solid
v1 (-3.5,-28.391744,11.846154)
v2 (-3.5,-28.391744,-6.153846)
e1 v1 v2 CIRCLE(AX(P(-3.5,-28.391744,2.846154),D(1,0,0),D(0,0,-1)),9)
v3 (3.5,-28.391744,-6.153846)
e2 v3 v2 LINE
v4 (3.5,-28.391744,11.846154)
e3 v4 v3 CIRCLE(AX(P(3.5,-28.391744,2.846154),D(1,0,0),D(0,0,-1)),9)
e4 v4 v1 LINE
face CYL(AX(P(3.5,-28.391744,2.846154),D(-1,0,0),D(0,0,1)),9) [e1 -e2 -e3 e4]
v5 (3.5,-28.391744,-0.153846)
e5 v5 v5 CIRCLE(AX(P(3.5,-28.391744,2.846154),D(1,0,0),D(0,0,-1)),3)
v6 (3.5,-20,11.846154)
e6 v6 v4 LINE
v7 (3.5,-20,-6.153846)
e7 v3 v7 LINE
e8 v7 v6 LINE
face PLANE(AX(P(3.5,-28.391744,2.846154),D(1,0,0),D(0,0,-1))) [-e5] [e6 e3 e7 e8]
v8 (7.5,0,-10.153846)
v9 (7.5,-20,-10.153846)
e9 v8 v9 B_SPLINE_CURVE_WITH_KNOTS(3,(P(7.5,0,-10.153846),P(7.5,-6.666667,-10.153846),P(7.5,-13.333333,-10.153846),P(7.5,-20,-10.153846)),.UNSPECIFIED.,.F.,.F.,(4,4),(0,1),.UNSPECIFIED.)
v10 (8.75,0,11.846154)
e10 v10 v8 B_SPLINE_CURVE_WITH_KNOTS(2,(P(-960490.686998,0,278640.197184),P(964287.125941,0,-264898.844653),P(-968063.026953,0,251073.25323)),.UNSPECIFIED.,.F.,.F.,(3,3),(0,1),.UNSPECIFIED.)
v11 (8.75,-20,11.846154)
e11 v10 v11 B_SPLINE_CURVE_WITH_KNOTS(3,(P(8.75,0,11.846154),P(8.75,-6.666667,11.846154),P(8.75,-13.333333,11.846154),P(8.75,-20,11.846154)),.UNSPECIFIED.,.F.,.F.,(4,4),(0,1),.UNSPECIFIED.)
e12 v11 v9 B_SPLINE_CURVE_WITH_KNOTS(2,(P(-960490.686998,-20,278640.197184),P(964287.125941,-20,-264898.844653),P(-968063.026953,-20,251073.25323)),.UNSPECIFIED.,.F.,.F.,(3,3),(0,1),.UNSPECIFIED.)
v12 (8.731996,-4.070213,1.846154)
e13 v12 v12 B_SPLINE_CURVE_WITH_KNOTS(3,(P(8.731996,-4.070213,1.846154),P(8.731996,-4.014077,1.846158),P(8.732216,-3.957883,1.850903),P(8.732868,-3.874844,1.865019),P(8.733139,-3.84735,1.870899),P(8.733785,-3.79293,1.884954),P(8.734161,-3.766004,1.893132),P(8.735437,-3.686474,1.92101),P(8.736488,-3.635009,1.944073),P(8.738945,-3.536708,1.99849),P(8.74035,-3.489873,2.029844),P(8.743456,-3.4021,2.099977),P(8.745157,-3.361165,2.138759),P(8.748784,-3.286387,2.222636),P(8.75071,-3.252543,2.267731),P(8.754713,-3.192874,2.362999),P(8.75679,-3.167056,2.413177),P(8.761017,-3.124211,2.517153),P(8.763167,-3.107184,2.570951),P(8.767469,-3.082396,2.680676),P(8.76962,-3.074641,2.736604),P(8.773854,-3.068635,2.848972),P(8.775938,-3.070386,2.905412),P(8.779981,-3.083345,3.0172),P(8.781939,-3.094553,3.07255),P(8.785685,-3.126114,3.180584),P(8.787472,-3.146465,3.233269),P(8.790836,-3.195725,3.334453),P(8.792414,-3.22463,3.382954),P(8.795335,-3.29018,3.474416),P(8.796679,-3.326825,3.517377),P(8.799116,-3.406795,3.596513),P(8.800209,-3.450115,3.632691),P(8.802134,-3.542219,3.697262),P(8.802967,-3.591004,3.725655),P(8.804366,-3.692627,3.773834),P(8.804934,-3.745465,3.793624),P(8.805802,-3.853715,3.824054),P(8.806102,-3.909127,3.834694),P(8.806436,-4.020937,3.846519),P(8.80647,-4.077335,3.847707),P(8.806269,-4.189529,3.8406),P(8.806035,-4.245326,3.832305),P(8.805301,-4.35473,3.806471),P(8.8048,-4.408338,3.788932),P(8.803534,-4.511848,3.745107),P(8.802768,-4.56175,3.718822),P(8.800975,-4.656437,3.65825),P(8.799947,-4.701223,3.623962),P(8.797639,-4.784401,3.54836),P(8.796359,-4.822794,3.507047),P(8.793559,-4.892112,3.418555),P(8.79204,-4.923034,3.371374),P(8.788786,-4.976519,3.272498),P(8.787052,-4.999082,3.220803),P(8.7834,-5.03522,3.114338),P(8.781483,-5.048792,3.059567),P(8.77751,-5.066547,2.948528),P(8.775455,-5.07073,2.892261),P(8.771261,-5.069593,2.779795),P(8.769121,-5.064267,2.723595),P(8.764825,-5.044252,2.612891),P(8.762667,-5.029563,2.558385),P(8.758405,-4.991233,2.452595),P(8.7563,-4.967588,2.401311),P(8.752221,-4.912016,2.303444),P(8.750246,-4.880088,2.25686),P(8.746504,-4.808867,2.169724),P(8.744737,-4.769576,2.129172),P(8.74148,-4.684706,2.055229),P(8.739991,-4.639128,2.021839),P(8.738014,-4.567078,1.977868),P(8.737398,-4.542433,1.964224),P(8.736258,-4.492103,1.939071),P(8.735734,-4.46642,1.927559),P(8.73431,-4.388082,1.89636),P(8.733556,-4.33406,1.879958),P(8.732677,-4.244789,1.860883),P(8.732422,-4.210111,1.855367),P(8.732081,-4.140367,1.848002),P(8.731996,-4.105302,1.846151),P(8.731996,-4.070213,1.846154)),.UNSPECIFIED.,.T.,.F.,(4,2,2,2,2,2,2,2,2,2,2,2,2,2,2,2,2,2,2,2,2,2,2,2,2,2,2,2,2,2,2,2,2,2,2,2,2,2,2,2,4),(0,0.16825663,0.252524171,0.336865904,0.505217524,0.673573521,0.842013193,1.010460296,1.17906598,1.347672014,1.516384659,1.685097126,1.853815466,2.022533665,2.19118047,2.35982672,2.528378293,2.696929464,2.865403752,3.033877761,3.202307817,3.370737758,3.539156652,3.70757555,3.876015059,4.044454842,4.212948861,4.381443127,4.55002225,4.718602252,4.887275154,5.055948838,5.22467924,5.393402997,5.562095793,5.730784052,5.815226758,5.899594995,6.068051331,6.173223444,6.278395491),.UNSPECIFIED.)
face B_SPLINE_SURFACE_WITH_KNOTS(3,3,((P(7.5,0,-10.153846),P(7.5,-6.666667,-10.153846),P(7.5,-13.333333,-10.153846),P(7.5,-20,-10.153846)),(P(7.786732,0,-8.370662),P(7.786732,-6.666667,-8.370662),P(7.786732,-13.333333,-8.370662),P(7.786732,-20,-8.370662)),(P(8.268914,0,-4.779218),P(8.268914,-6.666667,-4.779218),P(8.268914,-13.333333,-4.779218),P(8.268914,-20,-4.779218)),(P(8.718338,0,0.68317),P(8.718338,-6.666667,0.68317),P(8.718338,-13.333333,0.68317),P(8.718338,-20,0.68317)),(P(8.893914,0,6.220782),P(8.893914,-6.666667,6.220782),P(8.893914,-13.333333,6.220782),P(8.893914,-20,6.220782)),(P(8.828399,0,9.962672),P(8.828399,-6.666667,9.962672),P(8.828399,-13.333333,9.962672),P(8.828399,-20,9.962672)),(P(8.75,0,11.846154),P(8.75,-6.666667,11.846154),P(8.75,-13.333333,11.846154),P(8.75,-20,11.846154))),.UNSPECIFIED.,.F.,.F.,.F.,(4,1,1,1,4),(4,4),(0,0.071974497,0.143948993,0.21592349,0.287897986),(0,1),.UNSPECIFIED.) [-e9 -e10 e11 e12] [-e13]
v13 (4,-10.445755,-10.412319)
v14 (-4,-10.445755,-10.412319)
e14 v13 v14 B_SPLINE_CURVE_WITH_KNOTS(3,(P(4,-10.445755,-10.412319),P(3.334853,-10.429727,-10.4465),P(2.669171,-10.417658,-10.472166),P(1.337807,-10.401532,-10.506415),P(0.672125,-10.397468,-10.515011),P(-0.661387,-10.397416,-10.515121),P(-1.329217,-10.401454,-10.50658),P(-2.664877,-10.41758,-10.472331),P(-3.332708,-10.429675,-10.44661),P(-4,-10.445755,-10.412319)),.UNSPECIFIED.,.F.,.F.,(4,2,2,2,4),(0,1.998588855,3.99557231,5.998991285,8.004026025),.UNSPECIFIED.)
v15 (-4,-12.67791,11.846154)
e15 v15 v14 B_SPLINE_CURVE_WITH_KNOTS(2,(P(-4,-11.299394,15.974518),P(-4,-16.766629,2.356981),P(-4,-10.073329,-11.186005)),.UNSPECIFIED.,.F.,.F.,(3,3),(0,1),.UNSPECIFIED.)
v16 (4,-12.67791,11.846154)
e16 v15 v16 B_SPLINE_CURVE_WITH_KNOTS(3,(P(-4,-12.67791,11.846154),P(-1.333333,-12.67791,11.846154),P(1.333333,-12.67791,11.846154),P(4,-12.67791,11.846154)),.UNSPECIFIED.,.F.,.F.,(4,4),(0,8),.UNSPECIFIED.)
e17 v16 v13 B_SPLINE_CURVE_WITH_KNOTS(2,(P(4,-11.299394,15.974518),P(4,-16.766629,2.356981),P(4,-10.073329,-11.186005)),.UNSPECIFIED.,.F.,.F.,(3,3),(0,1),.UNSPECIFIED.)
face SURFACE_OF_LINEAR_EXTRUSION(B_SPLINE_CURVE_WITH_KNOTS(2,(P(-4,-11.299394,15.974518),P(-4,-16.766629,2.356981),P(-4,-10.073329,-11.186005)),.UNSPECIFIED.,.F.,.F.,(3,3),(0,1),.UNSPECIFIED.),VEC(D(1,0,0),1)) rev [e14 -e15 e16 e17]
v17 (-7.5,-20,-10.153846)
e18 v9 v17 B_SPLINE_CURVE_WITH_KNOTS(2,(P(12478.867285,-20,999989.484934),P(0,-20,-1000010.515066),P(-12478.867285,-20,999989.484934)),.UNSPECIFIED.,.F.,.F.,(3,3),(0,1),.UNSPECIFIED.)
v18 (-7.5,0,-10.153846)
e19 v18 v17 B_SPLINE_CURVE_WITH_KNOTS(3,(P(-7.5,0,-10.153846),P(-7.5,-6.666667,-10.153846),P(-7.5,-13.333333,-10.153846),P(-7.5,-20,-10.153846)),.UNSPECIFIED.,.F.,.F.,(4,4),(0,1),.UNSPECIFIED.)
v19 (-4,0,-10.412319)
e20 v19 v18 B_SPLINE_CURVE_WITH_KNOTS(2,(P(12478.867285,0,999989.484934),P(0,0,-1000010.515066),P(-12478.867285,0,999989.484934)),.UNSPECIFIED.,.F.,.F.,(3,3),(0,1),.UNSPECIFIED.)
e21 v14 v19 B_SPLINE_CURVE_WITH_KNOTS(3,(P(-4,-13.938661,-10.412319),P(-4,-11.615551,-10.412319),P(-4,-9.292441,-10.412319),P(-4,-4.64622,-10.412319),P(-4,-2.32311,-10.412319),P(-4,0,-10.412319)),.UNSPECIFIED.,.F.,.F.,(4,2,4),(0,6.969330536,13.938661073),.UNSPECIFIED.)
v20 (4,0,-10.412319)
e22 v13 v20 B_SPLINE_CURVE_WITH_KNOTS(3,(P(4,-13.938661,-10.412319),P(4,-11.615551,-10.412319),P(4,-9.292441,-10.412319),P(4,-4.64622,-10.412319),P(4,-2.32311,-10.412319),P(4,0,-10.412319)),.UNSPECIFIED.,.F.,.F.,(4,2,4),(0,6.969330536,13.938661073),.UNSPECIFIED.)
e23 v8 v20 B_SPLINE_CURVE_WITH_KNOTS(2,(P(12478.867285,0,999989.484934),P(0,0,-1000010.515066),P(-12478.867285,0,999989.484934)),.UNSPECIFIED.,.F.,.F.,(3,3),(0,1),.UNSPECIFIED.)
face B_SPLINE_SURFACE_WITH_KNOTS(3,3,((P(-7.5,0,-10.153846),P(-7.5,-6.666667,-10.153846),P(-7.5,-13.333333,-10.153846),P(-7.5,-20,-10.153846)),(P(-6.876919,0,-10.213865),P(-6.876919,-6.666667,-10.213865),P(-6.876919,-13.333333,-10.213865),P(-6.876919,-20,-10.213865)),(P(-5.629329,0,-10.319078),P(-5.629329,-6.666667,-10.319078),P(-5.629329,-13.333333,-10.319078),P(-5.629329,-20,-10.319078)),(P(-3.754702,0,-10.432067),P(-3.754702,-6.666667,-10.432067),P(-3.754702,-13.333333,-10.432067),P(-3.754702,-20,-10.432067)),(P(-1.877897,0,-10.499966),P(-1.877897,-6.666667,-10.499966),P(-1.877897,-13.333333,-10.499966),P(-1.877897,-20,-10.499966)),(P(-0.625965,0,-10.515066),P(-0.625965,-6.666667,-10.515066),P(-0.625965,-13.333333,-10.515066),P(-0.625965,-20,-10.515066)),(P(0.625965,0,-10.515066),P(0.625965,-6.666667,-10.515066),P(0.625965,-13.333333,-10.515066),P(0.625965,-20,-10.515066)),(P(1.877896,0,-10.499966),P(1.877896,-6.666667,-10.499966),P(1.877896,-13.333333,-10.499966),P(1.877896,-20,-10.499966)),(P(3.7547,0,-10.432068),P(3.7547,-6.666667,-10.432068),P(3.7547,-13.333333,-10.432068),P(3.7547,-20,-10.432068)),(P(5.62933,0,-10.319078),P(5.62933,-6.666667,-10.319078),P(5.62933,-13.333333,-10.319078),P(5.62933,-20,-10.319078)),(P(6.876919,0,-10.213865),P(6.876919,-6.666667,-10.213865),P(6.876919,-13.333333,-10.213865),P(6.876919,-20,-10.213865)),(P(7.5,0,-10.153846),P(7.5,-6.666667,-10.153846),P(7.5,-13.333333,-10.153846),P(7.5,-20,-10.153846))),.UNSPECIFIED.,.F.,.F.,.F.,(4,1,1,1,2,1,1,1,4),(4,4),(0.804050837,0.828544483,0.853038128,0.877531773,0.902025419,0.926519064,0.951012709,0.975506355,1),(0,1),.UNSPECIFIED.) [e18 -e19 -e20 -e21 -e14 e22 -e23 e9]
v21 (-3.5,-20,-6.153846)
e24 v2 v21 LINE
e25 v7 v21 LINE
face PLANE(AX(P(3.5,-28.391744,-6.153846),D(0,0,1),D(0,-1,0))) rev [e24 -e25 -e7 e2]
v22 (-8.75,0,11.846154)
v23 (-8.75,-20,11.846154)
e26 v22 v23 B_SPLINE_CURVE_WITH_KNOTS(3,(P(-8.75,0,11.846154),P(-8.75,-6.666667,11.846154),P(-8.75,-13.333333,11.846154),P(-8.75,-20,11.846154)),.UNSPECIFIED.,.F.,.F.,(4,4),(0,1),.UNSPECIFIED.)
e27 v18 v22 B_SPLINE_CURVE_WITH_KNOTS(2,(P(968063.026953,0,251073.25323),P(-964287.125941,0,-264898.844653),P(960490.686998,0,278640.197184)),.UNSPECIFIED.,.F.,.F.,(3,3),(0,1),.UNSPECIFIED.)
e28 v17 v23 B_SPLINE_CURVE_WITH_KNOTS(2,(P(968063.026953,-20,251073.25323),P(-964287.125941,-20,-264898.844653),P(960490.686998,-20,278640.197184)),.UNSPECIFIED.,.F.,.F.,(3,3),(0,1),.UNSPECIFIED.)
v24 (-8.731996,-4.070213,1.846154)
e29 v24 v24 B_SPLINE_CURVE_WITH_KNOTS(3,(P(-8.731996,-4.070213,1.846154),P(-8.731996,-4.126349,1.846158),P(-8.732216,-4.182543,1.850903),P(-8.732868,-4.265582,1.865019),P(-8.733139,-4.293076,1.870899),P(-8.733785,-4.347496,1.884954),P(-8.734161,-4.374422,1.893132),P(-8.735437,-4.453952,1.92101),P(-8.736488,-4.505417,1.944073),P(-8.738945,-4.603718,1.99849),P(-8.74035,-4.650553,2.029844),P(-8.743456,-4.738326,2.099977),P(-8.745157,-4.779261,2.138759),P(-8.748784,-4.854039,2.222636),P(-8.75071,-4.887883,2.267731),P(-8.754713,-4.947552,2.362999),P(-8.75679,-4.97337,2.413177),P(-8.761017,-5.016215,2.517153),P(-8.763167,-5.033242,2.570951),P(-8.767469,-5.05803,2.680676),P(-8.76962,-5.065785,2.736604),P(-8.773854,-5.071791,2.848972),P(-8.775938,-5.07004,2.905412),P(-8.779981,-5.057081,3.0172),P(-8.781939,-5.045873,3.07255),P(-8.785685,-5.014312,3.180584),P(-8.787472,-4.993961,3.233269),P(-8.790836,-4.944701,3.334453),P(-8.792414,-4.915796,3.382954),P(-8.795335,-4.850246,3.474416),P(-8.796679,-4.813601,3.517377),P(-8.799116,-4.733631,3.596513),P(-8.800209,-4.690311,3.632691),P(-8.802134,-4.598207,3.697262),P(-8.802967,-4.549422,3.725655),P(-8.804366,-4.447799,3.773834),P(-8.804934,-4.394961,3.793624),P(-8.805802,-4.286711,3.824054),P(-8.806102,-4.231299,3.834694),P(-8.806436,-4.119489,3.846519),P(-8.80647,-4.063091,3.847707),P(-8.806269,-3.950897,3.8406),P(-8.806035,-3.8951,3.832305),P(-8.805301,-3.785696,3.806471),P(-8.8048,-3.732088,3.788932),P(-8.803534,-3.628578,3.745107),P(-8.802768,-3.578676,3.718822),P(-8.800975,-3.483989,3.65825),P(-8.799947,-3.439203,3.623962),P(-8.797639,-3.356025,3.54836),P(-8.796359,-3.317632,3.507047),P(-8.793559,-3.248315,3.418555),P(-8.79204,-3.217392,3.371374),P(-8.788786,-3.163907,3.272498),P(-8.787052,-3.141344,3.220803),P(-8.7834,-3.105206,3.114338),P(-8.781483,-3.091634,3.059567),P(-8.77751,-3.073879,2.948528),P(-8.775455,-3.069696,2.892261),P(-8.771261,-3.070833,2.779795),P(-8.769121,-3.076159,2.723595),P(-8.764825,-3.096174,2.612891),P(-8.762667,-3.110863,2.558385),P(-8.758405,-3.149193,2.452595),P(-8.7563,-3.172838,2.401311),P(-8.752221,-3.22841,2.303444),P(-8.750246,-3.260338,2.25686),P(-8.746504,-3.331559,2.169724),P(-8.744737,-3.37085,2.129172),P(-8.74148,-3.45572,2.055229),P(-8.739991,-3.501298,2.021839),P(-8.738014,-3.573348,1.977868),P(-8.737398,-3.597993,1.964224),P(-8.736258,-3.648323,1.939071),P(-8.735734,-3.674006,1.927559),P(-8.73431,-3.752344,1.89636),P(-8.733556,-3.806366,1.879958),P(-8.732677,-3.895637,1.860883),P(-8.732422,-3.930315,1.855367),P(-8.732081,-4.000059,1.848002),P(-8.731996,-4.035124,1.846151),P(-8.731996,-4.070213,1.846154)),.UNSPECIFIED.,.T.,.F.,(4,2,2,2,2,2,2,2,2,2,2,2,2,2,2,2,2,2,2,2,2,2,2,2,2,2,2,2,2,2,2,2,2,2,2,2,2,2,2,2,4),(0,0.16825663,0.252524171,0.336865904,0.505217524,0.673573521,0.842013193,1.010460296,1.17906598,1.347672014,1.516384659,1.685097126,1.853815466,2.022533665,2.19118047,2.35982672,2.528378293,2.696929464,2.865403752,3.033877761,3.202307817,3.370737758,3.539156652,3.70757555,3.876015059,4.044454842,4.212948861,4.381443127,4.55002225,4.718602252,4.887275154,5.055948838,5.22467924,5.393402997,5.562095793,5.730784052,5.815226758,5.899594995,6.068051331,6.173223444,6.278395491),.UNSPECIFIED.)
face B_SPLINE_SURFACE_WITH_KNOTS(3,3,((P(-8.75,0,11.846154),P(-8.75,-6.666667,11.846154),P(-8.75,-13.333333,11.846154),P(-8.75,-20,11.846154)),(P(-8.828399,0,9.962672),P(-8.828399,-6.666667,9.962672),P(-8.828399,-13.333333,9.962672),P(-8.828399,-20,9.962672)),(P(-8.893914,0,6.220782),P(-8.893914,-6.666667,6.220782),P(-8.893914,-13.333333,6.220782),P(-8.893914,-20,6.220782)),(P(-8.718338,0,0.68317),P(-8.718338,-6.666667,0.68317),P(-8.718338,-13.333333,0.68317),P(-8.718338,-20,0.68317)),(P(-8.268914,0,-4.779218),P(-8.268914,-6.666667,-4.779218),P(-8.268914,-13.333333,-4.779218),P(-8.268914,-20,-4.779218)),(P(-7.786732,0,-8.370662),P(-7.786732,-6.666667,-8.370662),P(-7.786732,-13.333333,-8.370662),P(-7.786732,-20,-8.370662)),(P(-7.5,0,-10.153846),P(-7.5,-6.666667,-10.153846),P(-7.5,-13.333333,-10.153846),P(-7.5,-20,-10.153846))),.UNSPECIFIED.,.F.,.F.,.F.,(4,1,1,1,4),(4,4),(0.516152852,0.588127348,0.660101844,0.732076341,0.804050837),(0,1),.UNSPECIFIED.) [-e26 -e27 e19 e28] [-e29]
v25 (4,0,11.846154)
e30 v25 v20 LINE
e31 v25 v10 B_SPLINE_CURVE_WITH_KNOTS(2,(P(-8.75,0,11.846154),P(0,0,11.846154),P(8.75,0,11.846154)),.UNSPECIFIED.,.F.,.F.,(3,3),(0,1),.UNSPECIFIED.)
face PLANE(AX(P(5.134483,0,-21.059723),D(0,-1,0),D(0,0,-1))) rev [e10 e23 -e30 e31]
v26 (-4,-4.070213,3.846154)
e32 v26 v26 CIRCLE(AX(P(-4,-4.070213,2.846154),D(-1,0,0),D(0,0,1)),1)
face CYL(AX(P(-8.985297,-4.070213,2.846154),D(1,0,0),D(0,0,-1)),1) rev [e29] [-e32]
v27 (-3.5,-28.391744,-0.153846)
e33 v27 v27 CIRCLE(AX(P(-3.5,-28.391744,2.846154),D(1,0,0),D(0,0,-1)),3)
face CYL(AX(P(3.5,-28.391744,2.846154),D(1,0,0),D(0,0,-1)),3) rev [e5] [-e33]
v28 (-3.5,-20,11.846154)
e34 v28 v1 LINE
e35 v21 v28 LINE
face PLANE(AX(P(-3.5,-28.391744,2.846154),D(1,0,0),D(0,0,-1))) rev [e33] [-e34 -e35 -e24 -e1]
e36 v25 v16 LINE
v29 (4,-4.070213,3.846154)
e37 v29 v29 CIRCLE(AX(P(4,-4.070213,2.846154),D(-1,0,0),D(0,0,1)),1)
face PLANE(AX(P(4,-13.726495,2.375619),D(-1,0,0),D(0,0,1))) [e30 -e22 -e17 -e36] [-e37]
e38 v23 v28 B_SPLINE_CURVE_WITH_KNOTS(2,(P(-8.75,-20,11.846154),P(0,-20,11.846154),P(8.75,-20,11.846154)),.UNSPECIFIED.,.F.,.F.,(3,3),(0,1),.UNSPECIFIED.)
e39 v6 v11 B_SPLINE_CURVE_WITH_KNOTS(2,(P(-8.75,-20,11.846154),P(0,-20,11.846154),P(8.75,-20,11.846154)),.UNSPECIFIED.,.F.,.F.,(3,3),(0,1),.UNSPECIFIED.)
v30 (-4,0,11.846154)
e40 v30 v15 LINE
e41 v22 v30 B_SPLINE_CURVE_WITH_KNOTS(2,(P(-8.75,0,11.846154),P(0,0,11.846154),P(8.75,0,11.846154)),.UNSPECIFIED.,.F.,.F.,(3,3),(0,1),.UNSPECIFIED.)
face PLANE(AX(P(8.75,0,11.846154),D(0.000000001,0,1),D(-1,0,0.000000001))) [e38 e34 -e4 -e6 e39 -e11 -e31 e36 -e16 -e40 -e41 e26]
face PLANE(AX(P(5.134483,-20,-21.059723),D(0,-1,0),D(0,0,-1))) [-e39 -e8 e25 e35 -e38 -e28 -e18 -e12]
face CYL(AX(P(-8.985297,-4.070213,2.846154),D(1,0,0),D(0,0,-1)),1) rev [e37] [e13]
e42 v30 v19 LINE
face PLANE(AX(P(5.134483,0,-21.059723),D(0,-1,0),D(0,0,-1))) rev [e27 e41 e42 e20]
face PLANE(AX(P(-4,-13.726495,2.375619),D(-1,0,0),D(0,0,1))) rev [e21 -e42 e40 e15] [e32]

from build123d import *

# Parameters (mm, degrees)
LOFT_START                = -20
LOFT_2_DEPTH              = 20
SLOT_BOSS_EXTRUDE_DEPTH   = 3.5
NOTCH_CUT_EXTRUDE_DEPTH   = 4
F_6_0MM_DOWEL_HOLE1_D     = 6
CUT_EXTRUDE1_DEPTH        = 41.209626458
CUT_EXTRUDE1_DEPTH_BACK   = 41.209626458
F_2MM_DOWEL_HOLE_SKETCH_R = 1


# Read off the part's stored shape, not the designer's step: Loft
with BuildPart() as part:
    # Loft 2 outline → Loft 2 (new body)
    with BuildSketch(Plane(origin=(0, 0, 0), x_dir=(1.0, -2.490035096657917e-12, 0), z_dir=(2.490035096657917e-12, 1.0, -1.6178493389115347e-12)).offset(LOFT_START)):
        with BuildLine():
            add(Edge.make_bspline(
                [(-7.500000006, 10.153846153), (-6.876918809, 10.213864714), (-5.629329261, 10.319078273), (-3.754701534, 10.432067478), (-1.877896778, 10.499966465), (-0.625965179, 10.515066492), (0.625965179, 10.515066492), (1.877896376, 10.499966465), (3.754699934, 10.432067556), (5.629330497, 10.319078204), (6.876918808, 10.213864714), (7.5, 10.153846153)],
                knots=[0.804050837, 0.804050837, 0.804050837, 0.804050837, 0.828544483, 0.853038128, 0.877531773, 0.902025419, 0.902025419, 0.926519064, 0.951012709, 0.975506355, 1, 1, 1, 1], degree=3))
            add(Edge.make_bspline(
                [(-8.749999999, -11.846153861), (-8.82839887, -9.962671759), (-8.893913844, -6.220781941), (-8.718337998, -0.683170366), (-8.268913846, 4.779218054), (-7.786732208, 8.370661565), (-7.500000006, 10.153846153)],
                knots=[0.516152852, 0.516152852, 0.516152852, 0.516152852, 0.588127348, 0.660101844, 0.732076341, 0.804050837, 0.804050837, 0.804050837, 0.804050837], degree=3))
            Line((-8.749999999, -11.846153861), (8.75, -11.846153846))
            add(Edge.make_bspline(
                [(7.5, 10.153846153), (7.786732204, 8.370661588), (8.268913844, 4.779218073), (8.718337998, -0.683170354), (8.893913844, -6.220781934), (8.82839887, -9.962671757), (8.75, -11.846153846)],
                knots=[0, 0, 0, 0, 0.071974497, 0.143948993, 0.21592349, 0.287897986, 0.287897986, 0.287897986, 0.287897986], degree=3))
        make_face()
    extrude(amount=LOFT_2_DEPTH)

    # Slot Sketch → Slot Boss-Extrude (add, symmetric)
    with BuildSketch(Plane(origin=(0, 0, 0), x_dir=(0, 0, -1), z_dir=(1, 0, 0))):
        with BuildLine():
            Line((-11.846153846, -28.391743615), (-11.846153846, -12.033776613))
            ThreePointArc((-11.846153846, -12.033776613), (-2.846153846, -3.033776613), (6.153846154, -12.033776613))
            Line((6.153846154, -12.033776613), (6.153846154, -28.391743615))
            ThreePointArc((6.153846154, -28.391743615), (-2.846153846, -37.391743615), (-11.846153846, -28.391743615))
        make_face()
    extrude(amount=SLOT_BOSS_EXTRUDE_DEPTH, both=True)

    # Notch Sketch → Notch Cut-Extrude (cut, symmetric)
    with BuildSketch(Plane(origin=(0, 0, 0), x_dir=(0, 0, -1), z_dir=(1, 0, 0))):
        with BuildLine():
            Line((-15.97451802, -11.299393728), (-15.524991842, 1.708253078))
            Line((-15.524991842, 1.708253078), (11.860726968, 1.708253078))
            Line((11.860726968, 1.708253078), (11.18600525, -10.073329121))
            add(Edge.make_bspline(
                [(-15.97451802, -11.299393728), (-2.356980938, -16.766629454), (11.18600525, -10.073329121)],
                knots=[0, 0, 0, 1, 1, 1], degree=2))
        make_face()
    extrude(amount=NOTCH_CUT_EXTRUDE_DEPTH, both=True, mode=Mode.SUBTRACT)

    # Ø6.0mm Dowel Hole1 (through all)
    with Locations(Plane(origin=(3.5, 0, 0), x_dir=(0, 0, -1), z_dir=(1, 0, 0))):
        with Locations((-2.846153846, -28.391743615)):
            Hole(F_6_0MM_DOWEL_HOLE1_D / 2)

    # 2mm Dowel Hole Sketch → Cut-Extrude1 (cut, two sides: drawn at the far end of the back side and taken through both)
    with BuildSketch(Plane(origin=(0, 0, 0), x_dir=(0, 0, -1), z_dir=(1, 0, 0)).offset(-CUT_EXTRUDE1_DEPTH_BACK)):
        with Locations((-2.846153846, -4.070213016)):
            Circle(F_2MM_DOWEL_HOLE_SKETCH_R)
    extrude(amount=CUT_EXTRUDE1_DEPTH + CUT_EXTRUDE1_DEPTH_BACK, mode=Mode.SUBTRACT)


solid = part.part
